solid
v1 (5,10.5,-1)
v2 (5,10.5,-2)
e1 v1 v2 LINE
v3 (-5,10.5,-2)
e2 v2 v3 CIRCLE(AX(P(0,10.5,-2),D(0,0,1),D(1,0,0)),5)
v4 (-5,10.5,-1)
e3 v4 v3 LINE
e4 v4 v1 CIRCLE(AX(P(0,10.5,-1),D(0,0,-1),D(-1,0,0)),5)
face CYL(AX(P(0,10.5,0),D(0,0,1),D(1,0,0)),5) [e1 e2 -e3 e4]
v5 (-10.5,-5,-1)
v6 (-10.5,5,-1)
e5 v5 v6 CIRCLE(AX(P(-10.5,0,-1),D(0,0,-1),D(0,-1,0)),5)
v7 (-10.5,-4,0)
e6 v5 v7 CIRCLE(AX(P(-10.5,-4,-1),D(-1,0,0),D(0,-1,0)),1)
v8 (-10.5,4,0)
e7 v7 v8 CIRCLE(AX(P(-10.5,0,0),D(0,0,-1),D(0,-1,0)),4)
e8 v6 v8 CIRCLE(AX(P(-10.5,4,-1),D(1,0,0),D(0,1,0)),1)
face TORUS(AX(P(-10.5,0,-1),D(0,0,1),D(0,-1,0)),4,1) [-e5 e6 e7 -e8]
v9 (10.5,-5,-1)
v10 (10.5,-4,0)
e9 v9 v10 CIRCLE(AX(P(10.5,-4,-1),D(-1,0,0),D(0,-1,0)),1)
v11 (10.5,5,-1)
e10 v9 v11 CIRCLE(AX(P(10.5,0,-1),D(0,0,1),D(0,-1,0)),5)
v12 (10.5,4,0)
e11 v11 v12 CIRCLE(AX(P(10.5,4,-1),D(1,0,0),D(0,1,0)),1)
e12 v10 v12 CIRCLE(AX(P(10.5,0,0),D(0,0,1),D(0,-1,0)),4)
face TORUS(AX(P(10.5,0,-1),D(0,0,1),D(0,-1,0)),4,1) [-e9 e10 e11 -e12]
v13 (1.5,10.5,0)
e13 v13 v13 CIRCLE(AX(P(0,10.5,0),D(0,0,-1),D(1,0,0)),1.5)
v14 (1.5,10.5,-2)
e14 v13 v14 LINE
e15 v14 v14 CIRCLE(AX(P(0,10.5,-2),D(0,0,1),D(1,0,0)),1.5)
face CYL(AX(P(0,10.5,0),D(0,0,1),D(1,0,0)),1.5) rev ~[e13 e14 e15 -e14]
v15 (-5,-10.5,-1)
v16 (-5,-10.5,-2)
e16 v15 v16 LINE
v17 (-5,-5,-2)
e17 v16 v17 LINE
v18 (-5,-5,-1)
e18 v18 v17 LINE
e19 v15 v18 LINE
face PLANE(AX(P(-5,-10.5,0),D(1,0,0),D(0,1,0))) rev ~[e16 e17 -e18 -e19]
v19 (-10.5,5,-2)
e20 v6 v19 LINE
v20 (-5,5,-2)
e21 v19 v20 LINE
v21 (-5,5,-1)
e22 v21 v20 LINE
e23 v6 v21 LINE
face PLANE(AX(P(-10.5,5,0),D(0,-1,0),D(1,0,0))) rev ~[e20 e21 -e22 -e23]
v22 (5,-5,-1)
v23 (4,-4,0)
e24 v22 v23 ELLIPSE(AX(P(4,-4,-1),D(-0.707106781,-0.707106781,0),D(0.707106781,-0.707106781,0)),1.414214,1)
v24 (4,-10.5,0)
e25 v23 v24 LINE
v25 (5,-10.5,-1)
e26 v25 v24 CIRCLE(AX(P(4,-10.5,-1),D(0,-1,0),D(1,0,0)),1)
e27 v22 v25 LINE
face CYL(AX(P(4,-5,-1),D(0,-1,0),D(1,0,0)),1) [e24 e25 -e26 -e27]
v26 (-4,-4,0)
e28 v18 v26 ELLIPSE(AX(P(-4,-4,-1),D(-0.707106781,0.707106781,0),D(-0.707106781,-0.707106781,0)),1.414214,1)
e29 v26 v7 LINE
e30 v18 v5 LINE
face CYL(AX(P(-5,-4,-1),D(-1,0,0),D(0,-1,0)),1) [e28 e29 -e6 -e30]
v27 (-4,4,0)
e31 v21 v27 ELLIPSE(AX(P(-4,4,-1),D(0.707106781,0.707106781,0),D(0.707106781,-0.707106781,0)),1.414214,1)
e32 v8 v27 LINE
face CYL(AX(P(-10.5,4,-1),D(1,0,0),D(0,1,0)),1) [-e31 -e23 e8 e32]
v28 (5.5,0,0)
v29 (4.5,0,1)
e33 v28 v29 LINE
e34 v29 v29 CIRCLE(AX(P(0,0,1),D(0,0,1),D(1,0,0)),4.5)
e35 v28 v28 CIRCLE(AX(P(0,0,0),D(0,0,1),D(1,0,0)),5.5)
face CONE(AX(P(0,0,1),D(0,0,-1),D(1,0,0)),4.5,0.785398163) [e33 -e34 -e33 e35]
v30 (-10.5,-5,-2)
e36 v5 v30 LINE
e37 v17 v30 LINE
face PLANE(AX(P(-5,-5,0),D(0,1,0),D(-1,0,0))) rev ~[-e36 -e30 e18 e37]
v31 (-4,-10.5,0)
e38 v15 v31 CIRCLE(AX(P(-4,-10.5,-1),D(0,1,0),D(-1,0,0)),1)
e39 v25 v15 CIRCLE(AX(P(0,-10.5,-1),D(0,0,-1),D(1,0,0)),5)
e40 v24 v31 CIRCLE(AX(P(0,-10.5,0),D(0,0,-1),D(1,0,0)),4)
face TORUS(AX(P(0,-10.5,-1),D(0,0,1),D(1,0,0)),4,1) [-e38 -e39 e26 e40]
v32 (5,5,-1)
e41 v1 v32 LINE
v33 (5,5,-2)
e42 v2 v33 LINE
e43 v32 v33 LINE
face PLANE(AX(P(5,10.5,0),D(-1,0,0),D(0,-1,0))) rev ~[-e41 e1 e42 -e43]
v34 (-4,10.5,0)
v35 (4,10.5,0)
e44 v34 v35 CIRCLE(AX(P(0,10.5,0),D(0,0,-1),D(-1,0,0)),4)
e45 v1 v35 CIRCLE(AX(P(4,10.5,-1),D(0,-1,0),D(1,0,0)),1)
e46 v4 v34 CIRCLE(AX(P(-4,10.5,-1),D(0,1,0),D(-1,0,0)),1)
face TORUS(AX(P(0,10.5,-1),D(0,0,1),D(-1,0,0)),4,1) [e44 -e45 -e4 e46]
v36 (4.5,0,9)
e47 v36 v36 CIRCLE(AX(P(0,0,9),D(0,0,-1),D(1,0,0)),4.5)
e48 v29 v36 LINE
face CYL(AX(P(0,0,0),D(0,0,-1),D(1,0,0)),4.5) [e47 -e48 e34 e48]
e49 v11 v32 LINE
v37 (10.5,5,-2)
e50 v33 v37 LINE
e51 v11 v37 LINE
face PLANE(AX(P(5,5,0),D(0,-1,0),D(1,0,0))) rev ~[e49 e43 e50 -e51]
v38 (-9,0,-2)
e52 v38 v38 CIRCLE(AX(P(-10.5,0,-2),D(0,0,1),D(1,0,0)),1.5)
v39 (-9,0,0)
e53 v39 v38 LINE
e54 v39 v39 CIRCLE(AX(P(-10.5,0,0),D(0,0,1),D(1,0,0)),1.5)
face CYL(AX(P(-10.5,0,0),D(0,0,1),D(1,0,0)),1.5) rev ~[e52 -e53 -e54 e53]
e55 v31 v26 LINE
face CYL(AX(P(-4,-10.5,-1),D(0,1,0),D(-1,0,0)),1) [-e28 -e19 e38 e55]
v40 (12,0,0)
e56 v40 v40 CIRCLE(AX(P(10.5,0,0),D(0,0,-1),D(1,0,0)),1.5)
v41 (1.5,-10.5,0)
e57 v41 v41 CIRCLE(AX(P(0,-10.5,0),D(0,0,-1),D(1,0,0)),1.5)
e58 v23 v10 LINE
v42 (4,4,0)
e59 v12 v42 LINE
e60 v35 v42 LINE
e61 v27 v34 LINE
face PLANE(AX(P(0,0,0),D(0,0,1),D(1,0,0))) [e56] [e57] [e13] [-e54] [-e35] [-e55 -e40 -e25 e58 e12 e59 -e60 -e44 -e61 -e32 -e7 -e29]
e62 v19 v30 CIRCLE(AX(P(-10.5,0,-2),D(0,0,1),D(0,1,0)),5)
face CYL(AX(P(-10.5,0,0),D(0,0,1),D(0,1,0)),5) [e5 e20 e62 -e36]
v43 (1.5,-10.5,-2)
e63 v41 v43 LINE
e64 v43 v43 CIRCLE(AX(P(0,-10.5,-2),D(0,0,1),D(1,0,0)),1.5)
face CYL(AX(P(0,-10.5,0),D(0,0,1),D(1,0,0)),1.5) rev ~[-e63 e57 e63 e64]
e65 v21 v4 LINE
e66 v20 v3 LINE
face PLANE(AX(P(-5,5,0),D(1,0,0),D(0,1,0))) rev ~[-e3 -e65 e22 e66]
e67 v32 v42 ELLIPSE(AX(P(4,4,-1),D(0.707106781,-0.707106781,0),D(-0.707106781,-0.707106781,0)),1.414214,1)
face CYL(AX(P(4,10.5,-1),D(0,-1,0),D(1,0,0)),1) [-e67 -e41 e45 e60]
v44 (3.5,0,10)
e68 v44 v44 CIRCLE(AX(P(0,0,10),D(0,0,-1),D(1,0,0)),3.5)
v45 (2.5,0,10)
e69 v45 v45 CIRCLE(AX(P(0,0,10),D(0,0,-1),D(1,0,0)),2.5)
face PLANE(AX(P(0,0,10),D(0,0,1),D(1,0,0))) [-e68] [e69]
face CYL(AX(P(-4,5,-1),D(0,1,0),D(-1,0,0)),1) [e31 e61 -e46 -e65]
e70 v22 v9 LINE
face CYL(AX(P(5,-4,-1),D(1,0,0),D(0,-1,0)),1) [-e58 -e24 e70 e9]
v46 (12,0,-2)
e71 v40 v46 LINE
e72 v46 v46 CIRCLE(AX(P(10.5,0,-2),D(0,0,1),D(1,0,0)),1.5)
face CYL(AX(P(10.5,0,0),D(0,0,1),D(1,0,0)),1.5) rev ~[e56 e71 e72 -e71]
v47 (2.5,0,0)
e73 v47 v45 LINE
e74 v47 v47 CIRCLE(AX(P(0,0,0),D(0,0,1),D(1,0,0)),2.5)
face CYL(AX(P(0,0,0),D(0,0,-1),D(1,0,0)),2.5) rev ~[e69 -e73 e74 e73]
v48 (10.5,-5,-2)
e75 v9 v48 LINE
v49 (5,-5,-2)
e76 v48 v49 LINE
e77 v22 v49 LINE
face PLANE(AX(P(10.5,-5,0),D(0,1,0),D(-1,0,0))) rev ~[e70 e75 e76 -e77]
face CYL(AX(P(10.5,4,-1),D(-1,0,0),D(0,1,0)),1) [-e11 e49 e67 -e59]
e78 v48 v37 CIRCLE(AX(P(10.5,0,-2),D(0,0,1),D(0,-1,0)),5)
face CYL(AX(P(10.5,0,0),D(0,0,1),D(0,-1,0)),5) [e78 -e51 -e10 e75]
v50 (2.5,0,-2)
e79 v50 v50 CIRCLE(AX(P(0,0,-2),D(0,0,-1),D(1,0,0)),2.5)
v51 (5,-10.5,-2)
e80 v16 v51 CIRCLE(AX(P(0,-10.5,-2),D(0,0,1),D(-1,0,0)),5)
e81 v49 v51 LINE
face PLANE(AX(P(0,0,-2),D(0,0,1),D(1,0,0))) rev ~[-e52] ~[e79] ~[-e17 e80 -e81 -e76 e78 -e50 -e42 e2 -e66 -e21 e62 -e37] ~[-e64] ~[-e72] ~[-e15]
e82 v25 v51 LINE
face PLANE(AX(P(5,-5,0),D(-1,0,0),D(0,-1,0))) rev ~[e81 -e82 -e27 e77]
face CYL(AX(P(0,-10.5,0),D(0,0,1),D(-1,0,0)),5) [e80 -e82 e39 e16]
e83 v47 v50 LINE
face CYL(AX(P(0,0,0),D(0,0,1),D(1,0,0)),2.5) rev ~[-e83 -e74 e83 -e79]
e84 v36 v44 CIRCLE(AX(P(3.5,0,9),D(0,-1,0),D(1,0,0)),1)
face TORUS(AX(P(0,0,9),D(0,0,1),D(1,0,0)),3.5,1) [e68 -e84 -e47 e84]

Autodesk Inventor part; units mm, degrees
ref_plane "YZ Plane" through (0, 0, 0) normal (1, 0, 0) x (0, 1, 0)
ref_plane "XZ Plane" through (0, 0, 0) normal (0, 1, 0) x (-1, 0, 0)
ref_plane "XY Plane" through (0, 0, 0) normal (0, 0, 1) x (1, 0, 0)
sketch "Sketch1" plane through (0, 0, 0) normal (0, 0, 1) x (1, 0, 0)
  circle A0 centre (0, 0) radius 2.5
  line L0 (0, 0) -> (-10.5, 0)
  circle A1 centre (-10.5, 0) radius 1.5
  arc A2 (-10.5, 5) -> (-10.5, -5) centre (-10.5, 0) ccw
  line L1 (-10.5, 5) -> (0, 5)
  line L2 (0, 5) -> (0, -5)
  line L3 (0, -5) -> (-10.5, -5)
  line L4 (0, 0) -> (0, -10.5)
  circle A3 centre (0, -10.5) radius 1.5
  arc A4 (-5, -10.5) -> (5, -10.5) centre (0, -10.5) ccw
  line L5 (-5, -10.5) -> (-5, 0)
  line L6 (5, 0) -> (5, -10.5)
  line L7 (0, 0) -> (10.5, 0)
  circle A5 centre (10.5, 0) radius 1.5
  arc A6 (10.5, -5) -> (10.5, 5) centre (10.5, 0) ccw
  line L8 (10.5, -5) -> (0, -5)
  line L9 (0, 5) -> (10.5, 5)
  line L10 (0, 0) -> (0, 10.5)
  circle A7 centre (0, 10.5) radius 1.5
  arc A8 (5, 10.5) -> (-5, 10.5) centre (0, 10.5) ccw
  line L11 (5, 10.5) -> (5, 0)
  line L12 (-5, 0) -> (-5, 10.5)
  circle A9 centre (0, 0) radius 4.5
  point P0 (-5, -5)
  point P1 (5, -5)
  point P2 (5, 5)
  point P3 (-5, 5)
  dimension "d0" = 10.5
  dimension "d1" = 3
  dimension "d2" = 5
  dimension "d3" = 10
  dimension "d6" = 360
  dimension "d8" = 9
extrude "Extrusion1" add sketch "Sketch1" against normal blind 2 contours L7 A9 L2 A0 | A0 L2 A9 L7 | A0 L0 A9 L2 | L2 A9 L0 A0 | A9 L2 L9 L11 L7 | L7 L6 L8 L2 A9 | A9 L0 L12 L1 L2 | L2 L3 L5 L0 A9 | L11 L9 A6 L8 L6 | L1 L12 A8 L11 L9 | L8 L6 A4 L5 L3 | L5 L3 A2 L1 L12
extrude "Extrusion2" add sketch "Sketch1" along normal blind 10 contours L7 A9 L2 A0 | A0 L2 A9 L7 | A0 L0 A9 L2 | L2 A9 L0 A0
fillet "Fillet1" radius 1 12 edges at (-7.75, -5, 0) (-7.75, 5, 0) (-15.5, 0, 0) (5, -7.75, 0) (-5, -7.75, 0) (0, -15.5, 0) (15.5, 0, 0) (7.75, 5, 0) (7.75, -5, 0) (-5, 7.75, 0) (5, 7.75, 0) (0, 15.5, 0)
chamfer "Chamfer1" distance 1 angle 45 1 edges at (-4.5, 0, 0)
fillet "Fillet2" radius 1 1 edges at (-4.5, 0, 10)
properties part number "dudukan gps"
